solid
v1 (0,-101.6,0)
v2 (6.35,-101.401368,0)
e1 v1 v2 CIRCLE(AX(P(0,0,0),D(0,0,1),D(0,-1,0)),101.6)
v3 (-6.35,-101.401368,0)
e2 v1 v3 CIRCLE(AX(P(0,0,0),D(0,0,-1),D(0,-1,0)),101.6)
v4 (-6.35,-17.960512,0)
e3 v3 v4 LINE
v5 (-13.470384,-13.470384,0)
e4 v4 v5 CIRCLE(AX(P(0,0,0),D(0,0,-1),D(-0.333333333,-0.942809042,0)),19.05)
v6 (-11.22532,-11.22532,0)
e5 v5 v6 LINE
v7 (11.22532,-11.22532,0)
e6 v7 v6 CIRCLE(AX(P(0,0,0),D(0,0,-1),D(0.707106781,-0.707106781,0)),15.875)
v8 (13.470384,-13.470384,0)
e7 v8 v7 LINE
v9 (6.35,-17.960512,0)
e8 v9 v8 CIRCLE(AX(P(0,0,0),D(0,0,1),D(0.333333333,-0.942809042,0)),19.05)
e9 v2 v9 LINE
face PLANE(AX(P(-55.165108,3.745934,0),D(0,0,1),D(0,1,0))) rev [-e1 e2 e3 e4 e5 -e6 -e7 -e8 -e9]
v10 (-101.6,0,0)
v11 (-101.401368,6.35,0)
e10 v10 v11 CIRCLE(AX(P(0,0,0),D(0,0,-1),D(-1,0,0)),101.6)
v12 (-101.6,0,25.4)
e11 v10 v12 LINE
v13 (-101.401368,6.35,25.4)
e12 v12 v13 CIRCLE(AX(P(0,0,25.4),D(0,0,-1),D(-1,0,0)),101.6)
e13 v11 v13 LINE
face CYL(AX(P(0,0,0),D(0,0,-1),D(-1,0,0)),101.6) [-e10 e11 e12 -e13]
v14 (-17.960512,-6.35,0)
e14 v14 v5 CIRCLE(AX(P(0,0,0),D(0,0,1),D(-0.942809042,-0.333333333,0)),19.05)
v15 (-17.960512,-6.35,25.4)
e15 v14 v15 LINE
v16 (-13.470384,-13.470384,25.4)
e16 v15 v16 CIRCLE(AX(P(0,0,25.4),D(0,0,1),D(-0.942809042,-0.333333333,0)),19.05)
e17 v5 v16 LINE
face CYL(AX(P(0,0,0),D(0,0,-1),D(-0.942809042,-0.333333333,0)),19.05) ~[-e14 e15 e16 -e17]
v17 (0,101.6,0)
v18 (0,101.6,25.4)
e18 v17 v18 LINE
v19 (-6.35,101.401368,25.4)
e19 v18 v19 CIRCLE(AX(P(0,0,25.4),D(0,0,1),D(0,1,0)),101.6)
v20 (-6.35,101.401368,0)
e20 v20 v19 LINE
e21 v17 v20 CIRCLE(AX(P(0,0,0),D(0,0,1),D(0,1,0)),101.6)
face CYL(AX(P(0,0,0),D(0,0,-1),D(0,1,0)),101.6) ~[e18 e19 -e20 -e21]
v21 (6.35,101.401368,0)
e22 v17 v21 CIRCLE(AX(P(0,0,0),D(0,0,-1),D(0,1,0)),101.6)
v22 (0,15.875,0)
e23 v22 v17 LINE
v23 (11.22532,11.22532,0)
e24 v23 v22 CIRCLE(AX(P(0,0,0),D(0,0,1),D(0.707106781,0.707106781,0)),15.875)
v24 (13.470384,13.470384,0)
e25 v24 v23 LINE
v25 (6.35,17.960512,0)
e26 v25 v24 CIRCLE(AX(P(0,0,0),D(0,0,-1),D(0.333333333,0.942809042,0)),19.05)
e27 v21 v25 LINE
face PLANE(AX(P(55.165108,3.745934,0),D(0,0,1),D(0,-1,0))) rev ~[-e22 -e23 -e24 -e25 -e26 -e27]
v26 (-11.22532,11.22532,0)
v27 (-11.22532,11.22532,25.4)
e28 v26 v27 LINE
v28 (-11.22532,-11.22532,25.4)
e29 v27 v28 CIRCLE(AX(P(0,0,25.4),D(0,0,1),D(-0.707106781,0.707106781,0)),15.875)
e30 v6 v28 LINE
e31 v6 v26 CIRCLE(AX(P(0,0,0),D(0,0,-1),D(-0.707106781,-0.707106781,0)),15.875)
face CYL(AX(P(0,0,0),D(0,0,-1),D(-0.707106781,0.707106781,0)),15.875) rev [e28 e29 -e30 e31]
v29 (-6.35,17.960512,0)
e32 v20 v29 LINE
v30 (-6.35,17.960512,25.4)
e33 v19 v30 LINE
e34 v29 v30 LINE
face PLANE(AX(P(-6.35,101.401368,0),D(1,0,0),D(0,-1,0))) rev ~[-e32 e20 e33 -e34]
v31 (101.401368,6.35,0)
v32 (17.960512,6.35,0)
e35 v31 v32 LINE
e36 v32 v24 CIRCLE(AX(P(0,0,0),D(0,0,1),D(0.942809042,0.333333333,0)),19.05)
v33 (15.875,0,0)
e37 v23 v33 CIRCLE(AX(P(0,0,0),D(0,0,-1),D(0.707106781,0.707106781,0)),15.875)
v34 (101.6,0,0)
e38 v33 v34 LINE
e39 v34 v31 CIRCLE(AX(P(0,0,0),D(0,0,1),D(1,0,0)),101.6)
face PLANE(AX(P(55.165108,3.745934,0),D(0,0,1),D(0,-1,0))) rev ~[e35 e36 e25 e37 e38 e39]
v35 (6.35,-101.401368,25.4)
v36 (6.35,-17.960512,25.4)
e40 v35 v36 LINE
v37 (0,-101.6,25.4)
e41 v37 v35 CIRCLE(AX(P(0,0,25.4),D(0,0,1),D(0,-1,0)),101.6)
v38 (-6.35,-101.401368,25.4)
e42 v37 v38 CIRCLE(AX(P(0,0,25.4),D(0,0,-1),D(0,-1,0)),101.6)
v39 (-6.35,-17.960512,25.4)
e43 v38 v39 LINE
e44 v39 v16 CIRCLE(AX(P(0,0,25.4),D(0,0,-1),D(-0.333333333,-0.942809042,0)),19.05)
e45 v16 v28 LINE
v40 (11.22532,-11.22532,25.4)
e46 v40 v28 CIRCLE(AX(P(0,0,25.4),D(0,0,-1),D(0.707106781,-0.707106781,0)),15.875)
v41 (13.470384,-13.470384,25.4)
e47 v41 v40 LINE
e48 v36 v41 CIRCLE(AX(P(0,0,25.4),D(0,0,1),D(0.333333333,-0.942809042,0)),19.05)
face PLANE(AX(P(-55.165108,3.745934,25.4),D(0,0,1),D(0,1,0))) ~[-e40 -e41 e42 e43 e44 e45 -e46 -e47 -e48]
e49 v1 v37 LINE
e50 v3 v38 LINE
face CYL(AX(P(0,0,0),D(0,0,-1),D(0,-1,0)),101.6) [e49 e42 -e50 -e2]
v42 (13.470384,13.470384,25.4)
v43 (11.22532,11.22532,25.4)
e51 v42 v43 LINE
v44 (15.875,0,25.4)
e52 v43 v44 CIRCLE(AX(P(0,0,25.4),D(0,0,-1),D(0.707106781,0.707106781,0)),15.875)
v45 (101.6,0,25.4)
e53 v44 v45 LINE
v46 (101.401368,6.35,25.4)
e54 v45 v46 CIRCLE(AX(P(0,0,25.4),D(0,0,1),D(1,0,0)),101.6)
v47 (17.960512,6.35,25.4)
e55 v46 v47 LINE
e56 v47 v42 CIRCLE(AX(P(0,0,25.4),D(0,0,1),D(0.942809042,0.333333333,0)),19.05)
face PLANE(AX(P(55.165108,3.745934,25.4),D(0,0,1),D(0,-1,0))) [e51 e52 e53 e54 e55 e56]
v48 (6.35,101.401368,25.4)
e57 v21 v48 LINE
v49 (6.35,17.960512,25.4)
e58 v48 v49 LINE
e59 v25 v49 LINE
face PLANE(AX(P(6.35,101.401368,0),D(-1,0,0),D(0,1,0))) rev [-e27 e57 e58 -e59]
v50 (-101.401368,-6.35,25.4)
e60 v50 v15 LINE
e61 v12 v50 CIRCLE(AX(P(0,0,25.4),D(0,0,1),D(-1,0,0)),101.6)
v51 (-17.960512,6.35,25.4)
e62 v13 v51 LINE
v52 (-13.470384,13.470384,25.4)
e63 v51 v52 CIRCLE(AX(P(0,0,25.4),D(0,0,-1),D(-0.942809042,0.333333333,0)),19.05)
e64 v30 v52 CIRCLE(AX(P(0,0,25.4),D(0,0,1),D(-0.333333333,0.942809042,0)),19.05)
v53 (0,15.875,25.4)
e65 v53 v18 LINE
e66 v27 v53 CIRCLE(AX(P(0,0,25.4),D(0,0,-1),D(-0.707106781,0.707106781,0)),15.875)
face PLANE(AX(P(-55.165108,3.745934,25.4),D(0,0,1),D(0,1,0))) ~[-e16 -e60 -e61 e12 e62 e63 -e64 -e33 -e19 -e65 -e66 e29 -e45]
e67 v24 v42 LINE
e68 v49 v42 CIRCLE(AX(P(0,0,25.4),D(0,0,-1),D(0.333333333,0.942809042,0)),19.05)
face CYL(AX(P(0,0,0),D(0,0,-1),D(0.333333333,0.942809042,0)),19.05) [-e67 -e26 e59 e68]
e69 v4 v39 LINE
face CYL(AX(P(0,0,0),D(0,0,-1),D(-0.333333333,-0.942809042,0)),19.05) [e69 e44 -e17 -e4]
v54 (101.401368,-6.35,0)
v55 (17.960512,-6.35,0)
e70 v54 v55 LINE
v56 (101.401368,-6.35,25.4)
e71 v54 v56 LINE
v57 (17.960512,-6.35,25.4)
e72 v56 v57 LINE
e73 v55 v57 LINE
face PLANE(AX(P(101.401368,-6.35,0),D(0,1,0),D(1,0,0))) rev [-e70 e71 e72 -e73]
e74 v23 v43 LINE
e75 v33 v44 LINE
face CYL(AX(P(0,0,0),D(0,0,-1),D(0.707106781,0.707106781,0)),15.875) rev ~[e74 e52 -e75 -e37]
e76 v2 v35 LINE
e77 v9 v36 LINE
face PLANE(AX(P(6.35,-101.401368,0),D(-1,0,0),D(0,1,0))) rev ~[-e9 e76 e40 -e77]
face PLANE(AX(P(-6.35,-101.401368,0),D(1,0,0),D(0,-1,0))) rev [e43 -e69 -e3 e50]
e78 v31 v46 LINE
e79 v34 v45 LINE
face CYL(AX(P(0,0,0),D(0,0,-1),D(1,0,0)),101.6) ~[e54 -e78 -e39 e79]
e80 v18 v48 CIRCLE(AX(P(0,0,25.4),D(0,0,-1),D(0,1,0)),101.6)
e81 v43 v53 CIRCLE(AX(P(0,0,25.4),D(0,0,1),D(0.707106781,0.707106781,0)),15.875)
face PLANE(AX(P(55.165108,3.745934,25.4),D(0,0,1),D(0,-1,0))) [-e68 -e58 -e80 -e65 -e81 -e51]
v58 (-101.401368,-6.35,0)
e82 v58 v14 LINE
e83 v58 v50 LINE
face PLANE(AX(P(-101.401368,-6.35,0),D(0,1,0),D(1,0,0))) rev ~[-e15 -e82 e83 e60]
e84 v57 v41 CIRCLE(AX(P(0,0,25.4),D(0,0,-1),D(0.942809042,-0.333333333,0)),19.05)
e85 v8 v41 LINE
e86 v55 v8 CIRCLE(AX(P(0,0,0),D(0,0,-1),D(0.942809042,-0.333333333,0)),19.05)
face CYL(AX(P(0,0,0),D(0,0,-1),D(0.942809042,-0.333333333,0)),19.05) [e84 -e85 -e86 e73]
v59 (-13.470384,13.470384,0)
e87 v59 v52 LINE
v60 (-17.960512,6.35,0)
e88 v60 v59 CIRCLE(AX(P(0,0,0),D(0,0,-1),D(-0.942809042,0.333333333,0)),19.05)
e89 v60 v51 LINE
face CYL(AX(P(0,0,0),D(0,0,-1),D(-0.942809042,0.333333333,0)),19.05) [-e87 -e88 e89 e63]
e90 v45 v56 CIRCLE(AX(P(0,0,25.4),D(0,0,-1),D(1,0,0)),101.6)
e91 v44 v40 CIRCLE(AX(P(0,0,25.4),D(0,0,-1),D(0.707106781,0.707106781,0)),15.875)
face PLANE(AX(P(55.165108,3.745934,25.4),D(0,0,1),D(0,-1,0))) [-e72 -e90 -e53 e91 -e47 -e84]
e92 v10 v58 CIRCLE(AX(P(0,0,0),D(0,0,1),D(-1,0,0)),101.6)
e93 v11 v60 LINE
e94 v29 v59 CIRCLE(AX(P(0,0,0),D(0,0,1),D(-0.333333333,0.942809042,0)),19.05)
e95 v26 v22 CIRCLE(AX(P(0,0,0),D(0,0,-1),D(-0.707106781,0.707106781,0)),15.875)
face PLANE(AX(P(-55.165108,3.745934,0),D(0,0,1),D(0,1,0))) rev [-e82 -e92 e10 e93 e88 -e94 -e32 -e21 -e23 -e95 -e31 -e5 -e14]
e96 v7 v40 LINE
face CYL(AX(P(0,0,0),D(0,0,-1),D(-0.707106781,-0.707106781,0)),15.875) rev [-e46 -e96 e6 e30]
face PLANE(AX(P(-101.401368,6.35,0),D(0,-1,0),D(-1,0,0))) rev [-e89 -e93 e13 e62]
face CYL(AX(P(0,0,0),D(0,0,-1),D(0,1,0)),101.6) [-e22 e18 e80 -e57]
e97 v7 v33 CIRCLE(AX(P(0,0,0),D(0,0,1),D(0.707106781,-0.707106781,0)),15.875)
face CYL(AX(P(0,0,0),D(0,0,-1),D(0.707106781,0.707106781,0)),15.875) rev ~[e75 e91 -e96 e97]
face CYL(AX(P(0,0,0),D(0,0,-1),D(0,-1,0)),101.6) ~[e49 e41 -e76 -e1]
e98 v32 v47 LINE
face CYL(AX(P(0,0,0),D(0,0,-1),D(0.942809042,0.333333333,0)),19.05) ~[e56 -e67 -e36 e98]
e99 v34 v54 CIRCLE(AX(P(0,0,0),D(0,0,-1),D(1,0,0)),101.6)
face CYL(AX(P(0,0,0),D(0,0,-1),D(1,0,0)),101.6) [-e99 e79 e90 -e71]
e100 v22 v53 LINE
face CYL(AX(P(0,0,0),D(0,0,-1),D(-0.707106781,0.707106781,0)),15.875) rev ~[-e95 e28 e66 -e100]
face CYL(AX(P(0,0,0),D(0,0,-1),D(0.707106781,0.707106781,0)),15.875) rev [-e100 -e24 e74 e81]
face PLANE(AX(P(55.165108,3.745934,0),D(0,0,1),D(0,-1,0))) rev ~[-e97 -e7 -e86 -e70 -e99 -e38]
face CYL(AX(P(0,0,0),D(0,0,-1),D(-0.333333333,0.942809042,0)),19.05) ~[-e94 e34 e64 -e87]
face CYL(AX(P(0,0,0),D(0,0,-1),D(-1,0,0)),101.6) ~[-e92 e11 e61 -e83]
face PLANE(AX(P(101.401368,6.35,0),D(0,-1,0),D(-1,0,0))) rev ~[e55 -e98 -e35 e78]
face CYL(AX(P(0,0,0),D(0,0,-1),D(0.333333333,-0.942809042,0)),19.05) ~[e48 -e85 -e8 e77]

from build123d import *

# Parameters (mm, degrees)
F1_DEPTH        = 25.4
F1_COPIES_COUNT = 4


# Not quite as in the source:
# - a feature of the source that left no trace in its solid (it failed there, or was rolled back) is left out
# - a pattern or mirror of a feature is missing from the dataset's text; its kind, count and spacing are read off the source's solid


with BuildPart() as f1:
    # F0 (on Top) → F1 (new body)
    with BuildSketch(Plane.XY):
        with BuildLine():
            ThreePointArc((-11.2253201513, 11.2253201513), (-6.0750994888, 14.6665875786), (0, 15.875))
            Line((0, 15.875), (0, 101.6))
            ThreePointArc((0, 101.6), (-3.1765529485, 101.5503299422), (-6.35, 101.401368334))
            Line((-6.35, 101.401368334), (-6.35, 17.9605122421))
            ThreePointArc((-6.35, 17.9605122421), (-10.1613099439, 16.1136674976), (-13.4703841816, 13.4703841816))
            Line((-13.4703841816, 13.4703841816), (-11.2253201513, 11.2253201513))
        make_face()
    extrude(amount=F1_DEPTH)


with BuildPart() as f1_copies_1:
    # F1_copies: instance of F1
    add(f1.part.rotate(Axis((0, 0, 0), (0, 0, 1)), 1 * 360 / F1_COPIES_COUNT))


with BuildPart() as f1_copies_2:
    # F1_copies: instance of F1
    add(f1.part.rotate(Axis((0, 0, 0), (0, 0, 1)), 2 * 360 / F1_COPIES_COUNT))


with BuildPart() as f1_copies_3:
    # F1_copies: instance of F1
    add(f1.part.rotate(Axis((0, 0, 0), (0, 0, 1)), 3 * 360 / F1_COPIES_COUNT))


with BuildPart() as f1_1:
    add(f1.part)

    add(f1_copies_1.part)  # F1_copies1 merges F1_copies_1
    # F1_copies1: F1 across plane
    add(f1.part.mirror(Plane(origin=(0, 0, 0), x_dir=(0.7071067812, -0.7071067812, 0), z_dir=(-0.7071067812, -0.7071067812, 0))))



with BuildPart() as f1_2:
    add(f1_1.part)

    add(f1_copies_2.part)  # F4 merges F1_copies_2
    # F4: F1 across plane
    add(f1_1.part.mirror(Plane.XZ))



with BuildPart() as f1_3:
    add(f1_2.part)

    add(f1_copies_3.part)  # F5 merges F1_copies_3
    # F5: F1 across plane
    add(f1_2.part.mirror(Plane.YZ))


solid = f1_3.part
